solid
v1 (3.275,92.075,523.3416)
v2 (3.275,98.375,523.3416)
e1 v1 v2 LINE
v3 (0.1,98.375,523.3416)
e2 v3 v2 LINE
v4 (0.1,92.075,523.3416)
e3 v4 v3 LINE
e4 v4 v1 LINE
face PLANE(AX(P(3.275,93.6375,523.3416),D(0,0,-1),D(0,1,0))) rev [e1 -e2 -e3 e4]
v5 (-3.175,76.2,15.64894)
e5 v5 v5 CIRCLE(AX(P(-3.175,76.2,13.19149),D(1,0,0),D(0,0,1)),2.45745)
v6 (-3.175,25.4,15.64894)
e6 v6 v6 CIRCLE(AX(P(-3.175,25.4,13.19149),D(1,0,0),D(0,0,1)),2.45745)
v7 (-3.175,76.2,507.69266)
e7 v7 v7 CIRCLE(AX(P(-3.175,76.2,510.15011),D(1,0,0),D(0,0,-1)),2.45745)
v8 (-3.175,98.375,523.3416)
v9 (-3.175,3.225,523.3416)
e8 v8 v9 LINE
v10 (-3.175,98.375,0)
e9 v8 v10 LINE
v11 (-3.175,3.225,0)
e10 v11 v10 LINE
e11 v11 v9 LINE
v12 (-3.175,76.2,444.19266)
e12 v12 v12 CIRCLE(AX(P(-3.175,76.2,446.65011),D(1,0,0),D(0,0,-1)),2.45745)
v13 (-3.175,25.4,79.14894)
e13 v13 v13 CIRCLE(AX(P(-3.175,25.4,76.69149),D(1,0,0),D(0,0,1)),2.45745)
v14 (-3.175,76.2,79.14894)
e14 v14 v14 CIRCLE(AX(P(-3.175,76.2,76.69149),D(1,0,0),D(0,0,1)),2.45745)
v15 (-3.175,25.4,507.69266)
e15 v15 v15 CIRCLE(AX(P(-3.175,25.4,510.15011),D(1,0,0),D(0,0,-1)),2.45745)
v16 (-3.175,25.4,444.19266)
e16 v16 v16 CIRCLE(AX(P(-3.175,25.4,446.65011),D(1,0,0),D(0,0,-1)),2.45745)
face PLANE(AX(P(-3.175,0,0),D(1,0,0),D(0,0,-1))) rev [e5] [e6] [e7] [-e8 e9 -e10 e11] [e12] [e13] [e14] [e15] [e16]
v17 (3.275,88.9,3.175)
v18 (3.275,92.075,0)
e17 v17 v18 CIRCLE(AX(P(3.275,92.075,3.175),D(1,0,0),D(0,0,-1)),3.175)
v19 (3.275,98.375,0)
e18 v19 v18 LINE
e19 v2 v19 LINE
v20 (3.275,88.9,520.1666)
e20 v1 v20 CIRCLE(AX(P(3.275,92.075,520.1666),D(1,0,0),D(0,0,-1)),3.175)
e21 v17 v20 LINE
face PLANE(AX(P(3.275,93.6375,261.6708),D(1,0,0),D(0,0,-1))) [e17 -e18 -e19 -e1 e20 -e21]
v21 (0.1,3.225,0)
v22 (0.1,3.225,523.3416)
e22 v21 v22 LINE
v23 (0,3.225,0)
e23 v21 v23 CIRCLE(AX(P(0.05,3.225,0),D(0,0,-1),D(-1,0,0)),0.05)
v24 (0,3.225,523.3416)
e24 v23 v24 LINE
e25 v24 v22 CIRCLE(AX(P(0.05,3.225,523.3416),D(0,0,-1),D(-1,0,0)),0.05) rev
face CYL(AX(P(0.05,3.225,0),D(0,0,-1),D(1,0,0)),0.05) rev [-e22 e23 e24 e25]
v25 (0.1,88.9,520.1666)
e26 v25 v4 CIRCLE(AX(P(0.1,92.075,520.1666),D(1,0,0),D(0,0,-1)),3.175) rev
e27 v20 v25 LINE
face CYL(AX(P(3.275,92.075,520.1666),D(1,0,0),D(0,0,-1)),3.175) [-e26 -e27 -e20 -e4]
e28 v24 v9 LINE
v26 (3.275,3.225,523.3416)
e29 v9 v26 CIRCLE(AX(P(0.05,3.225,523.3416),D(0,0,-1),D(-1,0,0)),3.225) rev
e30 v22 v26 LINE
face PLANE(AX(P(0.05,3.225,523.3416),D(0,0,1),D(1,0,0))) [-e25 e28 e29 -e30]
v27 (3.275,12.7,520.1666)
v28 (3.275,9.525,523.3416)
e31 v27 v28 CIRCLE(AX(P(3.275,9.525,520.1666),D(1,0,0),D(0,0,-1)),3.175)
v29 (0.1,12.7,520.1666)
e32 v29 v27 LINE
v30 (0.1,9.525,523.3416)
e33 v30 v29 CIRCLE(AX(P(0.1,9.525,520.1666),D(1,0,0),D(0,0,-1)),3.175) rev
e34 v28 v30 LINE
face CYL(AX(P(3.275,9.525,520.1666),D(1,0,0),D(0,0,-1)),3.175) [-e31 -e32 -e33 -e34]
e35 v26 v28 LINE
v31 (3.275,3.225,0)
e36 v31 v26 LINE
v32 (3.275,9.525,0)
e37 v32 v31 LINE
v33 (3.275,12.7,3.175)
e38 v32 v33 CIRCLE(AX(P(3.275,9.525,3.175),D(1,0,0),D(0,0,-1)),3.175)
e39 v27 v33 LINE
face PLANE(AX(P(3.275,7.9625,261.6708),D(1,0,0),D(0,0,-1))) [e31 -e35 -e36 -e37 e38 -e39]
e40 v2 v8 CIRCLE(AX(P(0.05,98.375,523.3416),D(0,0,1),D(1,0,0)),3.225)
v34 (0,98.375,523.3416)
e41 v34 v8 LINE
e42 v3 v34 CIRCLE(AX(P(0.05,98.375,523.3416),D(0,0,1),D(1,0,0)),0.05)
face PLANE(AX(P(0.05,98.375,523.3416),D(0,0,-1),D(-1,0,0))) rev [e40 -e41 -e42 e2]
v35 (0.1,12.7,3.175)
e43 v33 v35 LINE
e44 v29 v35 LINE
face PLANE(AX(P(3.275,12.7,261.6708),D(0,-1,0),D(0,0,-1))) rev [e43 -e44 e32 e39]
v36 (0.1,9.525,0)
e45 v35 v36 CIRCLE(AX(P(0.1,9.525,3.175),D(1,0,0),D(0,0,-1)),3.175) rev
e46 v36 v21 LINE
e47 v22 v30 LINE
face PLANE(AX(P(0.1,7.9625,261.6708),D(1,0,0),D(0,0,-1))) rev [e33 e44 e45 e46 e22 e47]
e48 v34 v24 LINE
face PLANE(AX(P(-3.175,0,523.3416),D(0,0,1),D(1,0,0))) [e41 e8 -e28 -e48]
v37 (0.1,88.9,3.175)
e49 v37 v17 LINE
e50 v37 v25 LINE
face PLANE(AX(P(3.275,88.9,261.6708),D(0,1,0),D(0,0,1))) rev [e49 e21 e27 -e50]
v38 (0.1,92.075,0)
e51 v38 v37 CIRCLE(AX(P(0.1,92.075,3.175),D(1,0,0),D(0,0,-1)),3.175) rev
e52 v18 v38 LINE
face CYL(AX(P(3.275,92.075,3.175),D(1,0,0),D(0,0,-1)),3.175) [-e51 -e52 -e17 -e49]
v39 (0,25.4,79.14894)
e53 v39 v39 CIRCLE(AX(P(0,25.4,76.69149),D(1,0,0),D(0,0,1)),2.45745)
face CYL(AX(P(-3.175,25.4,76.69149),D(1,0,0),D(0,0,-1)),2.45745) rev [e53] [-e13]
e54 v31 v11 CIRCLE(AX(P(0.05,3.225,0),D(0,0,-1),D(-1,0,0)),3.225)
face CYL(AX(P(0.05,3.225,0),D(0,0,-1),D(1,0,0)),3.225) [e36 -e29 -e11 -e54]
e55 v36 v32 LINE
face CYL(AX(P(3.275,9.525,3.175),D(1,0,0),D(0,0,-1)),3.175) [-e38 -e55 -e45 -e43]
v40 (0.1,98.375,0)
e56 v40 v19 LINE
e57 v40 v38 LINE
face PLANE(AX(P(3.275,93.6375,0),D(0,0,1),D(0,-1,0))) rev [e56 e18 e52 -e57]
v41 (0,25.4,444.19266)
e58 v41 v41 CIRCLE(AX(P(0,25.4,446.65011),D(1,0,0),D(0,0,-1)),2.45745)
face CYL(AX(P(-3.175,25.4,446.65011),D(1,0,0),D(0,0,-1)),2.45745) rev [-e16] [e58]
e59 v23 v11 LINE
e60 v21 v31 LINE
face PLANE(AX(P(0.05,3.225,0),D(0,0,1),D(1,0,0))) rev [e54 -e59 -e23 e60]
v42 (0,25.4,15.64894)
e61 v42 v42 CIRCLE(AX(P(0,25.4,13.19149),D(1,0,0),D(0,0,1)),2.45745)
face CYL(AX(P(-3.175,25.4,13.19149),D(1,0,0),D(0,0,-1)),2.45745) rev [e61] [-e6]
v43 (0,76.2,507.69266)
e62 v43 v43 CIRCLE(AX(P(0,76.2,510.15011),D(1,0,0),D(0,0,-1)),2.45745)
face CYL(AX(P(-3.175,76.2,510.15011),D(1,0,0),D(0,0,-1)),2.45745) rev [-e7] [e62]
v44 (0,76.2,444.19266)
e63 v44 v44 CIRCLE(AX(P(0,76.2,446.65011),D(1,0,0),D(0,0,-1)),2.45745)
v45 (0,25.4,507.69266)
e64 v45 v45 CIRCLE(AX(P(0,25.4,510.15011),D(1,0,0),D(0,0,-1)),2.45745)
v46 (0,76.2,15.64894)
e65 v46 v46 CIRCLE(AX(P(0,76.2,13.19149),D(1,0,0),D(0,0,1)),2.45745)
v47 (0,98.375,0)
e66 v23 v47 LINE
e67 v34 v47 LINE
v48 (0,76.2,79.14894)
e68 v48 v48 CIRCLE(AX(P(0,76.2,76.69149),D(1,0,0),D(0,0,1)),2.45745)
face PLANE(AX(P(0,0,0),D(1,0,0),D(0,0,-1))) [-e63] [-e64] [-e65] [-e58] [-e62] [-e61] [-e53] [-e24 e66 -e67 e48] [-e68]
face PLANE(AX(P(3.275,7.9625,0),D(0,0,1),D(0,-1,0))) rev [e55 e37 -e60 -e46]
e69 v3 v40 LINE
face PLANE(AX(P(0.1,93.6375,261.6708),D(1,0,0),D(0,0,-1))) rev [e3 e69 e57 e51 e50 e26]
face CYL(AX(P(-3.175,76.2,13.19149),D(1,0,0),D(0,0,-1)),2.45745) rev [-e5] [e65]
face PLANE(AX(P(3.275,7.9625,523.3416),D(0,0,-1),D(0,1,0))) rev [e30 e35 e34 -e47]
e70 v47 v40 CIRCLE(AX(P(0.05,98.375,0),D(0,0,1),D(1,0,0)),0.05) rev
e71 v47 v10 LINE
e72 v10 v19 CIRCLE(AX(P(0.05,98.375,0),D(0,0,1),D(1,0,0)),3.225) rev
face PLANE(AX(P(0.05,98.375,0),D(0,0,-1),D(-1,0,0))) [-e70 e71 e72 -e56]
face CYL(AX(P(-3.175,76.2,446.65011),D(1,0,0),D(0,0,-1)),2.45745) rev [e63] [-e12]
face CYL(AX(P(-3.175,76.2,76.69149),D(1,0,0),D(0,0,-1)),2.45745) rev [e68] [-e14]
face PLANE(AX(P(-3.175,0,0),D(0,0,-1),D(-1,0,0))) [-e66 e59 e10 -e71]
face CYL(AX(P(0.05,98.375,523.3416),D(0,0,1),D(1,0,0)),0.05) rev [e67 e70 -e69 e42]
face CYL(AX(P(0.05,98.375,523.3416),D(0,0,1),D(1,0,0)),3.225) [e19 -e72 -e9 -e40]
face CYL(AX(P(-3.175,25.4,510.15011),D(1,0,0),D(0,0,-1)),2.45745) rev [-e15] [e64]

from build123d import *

# Parameters (mm, degrees)
SKETCH1_W          = 523.3416
SKETCH1_H          = 101.6
SKETCH1_R          = 2.45745
BASE_FLANGE1_DEPTH = 3.175
HEM1_DEPTH         = 523.3416
HEM1_2_DEPTH       = 523.3416
FILLET1_R          = 3.175


# Read off the part's stored shape, not the designer's step: Hem1
# Sheet-metal steps are written as plain solids
with BuildPart() as part:
    # Sketch1 → Base-Flange1 (new body)
    with BuildSketch(Plane(origin=(0, 0, 0), x_dir=(0, 0, -1), z_dir=(1, 0, 0))):
        with Locations((-261.6708, 50.8)):
            Rectangle(SKETCH1_W, SKETCH1_H)
        with Locations((-510.15011, 76.2)):
            Circle(SKETCH1_R, mode=Mode.SUBTRACT)
        with Locations((-446.65011, 76.2)):
            Circle(SKETCH1_R, mode=Mode.SUBTRACT)
        with Locations((-446.65011, 25.4)):
            Circle(SKETCH1_R, mode=Mode.SUBTRACT)
        with Locations((-510.15011, 25.4)):
            Circle(SKETCH1_R, mode=Mode.SUBTRACT)
        with Locations(Location((-76.69149, 76.2, 0), (0, 0, 180))):
            Circle(SKETCH1_R, mode=Mode.SUBTRACT)
        with Locations(Location((-76.69149, 25.4, 0), (0, 0, 180))):
            Circle(SKETCH1_R, mode=Mode.SUBTRACT)
        with Locations(Location((-13.19149, 25.4, 0), (0, 0, 180))):
            Circle(SKETCH1_R, mode=Mode.SUBTRACT)
        with Locations(Location((-13.19149, 76.2, 0), (0, 0, 180))):
            Circle(SKETCH1_R, mode=Mode.SUBTRACT)
    extrude(amount=-BASE_FLANGE1_DEPTH)

    # Hem1 outline → Hem1 (cut)
    with BuildSketch(Plane.XY):
        with BuildLine():
            ThreePointArc((-3.175, 98.375), (-2.248029047, 100.637672645), (0, 101.59961238))
            Line((0, 101.59961238), (0, 101.6))
            Line((0, 101.6), (-3.175, 101.6))
            Line((-3.175, 101.6), (-3.175, 98.375))
        make_face()
        with BuildLine():
            ThreePointArc((0, 0.00038762), (-2.248029047, 0.962327355), (-3.175, 3.225))
            Line((-3.175, 3.225), (-3.175, 0))
            Line((-3.175, 0), (0, 0))
            Line((0, 0), (0, 0.00038762))
        make_face()
    extrude(amount=HEM1_DEPTH, mode=Mode.SUBTRACT)

    # Hem1 2 outline → Hem1 2 (add)
    with BuildSketch(Plane.XY):
        with BuildLine():
            Line((0.1, 88.9), (3.275, 88.9))
            Line((3.275, 88.9), (3.275, 98.375))
            ThreePointArc((3.275, 98.375), (2.312672645, 100.673029047), (0, 101.59961238))
            Line((0, 101.59961238), (0, 98.375))
            ThreePointArc((0, 98.375), (0.05, 98.425), (0.1, 98.375))
            Line((0.1, 98.375), (0.1, 88.9))
        make_face()
        with BuildLine():
            ThreePointArc((0.1, 3.225), (0.05, 3.175), (0, 3.225))
            Line((0, 3.225), (0, 0.00038762))
            ThreePointArc((0, 0.00038762), (2.312672645, 0.926970953), (3.275, 3.225))
            Line((3.275, 3.225), (3.275, 12.7))
            Line((3.275, 12.7), (0.1, 12.7))
            Line((0.1, 12.7), (0.1, 3.225))
        make_face()
    extrude(amount=HEM1_2_DEPTH)

    # Fillet1
    fillet1_edges = [part.edges().sort_by_distance(p)[0] for p in [
        (1.6875, 88.9, 523.3416),
        (1.6875, 88.9, 0),
        (1.6875, 12.7, 0),
        (1.6875, 12.7, 523.3416),
    ]]
    fillet(fillet1_edges, radius=FILLET1_R)


solid = part.part
